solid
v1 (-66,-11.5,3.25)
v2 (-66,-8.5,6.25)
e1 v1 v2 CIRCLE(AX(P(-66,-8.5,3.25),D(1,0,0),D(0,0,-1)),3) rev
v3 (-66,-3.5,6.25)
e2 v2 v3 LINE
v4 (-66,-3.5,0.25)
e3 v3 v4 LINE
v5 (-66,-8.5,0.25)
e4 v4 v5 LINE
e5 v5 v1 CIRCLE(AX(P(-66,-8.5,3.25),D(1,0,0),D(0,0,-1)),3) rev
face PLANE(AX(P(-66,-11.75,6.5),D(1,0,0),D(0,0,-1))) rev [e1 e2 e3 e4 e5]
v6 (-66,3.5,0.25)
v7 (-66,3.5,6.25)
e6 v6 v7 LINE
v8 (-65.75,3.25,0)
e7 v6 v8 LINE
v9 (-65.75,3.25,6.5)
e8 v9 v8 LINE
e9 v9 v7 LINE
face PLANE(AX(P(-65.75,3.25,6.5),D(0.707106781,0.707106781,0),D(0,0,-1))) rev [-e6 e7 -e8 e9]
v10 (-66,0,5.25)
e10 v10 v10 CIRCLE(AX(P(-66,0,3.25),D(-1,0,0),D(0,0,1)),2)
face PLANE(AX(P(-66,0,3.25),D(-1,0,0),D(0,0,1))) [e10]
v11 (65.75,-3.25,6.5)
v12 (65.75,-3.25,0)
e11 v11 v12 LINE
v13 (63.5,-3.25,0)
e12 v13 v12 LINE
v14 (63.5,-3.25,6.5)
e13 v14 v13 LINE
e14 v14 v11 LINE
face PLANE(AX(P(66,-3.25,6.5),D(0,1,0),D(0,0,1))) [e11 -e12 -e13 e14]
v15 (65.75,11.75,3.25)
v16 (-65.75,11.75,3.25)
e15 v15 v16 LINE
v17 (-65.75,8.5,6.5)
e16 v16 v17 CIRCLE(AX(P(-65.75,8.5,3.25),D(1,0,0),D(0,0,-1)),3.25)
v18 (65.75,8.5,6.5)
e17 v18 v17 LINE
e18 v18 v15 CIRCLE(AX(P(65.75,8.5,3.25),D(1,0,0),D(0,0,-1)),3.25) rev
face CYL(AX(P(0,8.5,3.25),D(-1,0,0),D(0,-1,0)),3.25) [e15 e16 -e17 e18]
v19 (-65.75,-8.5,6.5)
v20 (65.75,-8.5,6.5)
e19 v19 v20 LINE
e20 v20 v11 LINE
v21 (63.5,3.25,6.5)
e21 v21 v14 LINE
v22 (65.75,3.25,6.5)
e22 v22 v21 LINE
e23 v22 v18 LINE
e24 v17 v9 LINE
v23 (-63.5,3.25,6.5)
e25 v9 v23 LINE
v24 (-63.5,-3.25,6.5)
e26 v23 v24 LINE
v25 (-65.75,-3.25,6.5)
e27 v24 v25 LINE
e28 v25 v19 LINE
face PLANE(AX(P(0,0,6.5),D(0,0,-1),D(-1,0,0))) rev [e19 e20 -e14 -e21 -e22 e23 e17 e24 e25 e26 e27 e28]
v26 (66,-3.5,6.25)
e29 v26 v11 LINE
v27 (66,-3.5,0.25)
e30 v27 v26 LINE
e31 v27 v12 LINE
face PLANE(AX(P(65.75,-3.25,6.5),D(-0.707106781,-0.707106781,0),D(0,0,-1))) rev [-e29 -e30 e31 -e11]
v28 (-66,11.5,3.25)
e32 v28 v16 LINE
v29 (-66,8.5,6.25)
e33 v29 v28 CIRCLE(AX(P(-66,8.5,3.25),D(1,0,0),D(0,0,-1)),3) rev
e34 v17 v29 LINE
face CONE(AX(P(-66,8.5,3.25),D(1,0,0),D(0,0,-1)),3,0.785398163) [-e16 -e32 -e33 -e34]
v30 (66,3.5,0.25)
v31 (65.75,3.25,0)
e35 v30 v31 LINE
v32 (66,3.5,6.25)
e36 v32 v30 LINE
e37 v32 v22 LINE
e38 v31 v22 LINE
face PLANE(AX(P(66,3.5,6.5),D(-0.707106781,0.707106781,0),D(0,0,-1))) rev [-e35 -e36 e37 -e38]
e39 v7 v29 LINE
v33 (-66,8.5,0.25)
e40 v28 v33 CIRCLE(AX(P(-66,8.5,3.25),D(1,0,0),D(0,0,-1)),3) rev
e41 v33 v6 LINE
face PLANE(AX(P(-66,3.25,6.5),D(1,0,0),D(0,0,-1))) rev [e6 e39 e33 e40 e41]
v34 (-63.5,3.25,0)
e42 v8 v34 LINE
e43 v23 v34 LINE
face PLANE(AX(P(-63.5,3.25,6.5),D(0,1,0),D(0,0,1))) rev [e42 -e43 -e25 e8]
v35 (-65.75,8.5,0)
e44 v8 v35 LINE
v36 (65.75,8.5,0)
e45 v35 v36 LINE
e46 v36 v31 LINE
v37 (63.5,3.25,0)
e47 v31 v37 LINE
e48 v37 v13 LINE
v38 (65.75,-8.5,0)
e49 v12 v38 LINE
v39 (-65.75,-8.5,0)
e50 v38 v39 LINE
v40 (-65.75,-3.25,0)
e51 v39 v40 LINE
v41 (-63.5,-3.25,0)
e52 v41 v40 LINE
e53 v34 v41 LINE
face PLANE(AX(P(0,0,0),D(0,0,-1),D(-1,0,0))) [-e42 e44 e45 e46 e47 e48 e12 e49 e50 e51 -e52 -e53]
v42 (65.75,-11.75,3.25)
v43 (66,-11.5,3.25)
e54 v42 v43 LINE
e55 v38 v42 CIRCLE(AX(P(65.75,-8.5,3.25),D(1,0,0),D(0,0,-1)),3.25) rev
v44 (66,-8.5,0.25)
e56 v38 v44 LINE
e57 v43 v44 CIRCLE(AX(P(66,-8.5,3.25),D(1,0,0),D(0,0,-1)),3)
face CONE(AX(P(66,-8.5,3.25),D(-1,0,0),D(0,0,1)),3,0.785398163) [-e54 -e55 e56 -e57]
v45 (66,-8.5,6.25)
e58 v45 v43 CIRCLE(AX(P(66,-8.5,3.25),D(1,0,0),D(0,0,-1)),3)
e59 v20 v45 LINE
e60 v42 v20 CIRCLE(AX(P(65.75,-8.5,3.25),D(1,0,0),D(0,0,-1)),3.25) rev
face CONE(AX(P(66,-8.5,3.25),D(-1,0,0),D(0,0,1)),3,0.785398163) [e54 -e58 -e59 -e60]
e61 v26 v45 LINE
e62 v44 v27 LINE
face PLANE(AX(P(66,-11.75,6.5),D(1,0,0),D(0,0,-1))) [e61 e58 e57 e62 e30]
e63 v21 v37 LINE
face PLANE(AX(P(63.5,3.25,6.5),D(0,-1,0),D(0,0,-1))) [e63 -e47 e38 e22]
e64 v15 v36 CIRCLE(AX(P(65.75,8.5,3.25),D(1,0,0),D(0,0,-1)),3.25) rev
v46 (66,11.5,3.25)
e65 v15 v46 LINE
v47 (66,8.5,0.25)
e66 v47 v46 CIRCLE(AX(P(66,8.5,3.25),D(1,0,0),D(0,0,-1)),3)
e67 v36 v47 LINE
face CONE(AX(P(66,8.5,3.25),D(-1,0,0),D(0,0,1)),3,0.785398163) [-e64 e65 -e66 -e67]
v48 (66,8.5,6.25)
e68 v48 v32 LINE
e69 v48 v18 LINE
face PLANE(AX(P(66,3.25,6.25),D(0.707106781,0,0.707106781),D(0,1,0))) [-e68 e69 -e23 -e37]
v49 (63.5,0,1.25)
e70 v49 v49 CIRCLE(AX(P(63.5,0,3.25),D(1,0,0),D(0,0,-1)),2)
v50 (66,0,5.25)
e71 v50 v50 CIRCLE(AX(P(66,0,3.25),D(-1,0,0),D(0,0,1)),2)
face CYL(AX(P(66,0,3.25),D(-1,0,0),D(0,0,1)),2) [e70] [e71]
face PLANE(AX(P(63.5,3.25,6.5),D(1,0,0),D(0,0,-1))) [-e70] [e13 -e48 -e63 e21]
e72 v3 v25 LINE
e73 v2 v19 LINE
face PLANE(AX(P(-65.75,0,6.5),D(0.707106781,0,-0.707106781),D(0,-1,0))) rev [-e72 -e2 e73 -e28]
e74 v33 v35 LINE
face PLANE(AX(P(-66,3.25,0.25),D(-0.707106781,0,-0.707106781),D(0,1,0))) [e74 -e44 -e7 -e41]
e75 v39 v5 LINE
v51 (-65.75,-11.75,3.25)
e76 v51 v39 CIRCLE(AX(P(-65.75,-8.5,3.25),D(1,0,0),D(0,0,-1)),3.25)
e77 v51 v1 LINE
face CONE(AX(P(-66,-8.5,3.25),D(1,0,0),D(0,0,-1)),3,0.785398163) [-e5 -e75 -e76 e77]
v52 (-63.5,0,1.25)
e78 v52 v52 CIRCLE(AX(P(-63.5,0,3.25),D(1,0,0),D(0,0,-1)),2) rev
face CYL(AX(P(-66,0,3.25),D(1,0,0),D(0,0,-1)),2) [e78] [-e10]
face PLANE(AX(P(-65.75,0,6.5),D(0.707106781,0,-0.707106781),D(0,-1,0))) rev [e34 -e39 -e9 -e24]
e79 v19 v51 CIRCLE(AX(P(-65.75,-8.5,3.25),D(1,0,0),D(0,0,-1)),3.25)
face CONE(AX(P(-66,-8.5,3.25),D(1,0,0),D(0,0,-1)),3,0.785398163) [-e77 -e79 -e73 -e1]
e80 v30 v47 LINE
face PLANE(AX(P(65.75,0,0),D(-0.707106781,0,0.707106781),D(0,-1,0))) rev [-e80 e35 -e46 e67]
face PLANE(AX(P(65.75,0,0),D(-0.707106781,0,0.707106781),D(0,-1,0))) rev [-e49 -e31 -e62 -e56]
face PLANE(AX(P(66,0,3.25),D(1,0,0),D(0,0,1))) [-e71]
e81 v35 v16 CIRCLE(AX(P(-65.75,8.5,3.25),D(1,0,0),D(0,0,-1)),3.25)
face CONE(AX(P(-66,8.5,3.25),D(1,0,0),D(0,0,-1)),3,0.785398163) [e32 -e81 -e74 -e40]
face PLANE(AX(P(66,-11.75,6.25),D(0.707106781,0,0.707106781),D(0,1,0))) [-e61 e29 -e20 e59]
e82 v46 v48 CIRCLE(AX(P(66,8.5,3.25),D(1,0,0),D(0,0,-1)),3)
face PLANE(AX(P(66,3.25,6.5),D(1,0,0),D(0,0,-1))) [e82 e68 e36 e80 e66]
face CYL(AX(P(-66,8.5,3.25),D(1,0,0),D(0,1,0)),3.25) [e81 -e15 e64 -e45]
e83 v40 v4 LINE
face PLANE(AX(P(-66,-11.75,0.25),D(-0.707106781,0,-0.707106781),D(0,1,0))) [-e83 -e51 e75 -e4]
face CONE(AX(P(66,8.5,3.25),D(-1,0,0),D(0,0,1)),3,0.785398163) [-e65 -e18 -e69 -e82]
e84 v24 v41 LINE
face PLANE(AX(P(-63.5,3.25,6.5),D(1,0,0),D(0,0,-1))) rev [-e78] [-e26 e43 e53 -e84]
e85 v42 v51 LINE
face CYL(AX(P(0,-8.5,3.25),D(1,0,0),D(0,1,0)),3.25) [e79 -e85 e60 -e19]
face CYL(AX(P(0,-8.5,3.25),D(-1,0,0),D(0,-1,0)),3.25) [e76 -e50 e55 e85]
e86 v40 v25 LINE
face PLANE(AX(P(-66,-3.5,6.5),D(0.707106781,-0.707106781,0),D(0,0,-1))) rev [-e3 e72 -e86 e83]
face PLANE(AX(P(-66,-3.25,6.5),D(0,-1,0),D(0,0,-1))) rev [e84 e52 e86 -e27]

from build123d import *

# Parameters (mm, degrees)
BOSS_EXTRUDE1_DEPTH = 6.5
SKETCH2_R           = 2
BOSS_EXTRUDE2_DEPTH = 2.5
FILLET5_R           = 3.25
CHAMFER1_SIZE       = 0.25


with BuildPart() as part:
    # Sketch1 → Boss-Extrude1 (new body)
    with BuildSketch(Plane.XY):
        Polygon((0, -11.75), (-66, -11.75), (-66, -3.25), (-63.5, -3.25), (-63.5, 3.25), (-66, 3.25), (-66, 11.75), (0, 11.75), align=None)
    boss_extrude1 = extrude(amount=BOSS_EXTRUDE1_DEPTH)

    # Sketch2 → Boss-Extrude2 (add)
    with BuildSketch(Plane.ZY.offset(63.5)):
        with Locations(Location((3.25, 0, 0), (0, 0, 180))):
            Circle(SKETCH2_R)
    boss_extrude2 = extrude(amount=BOSS_EXTRUDE2_DEPTH)

    # Mirror1: Boss-Extrude1, Boss-Extrude2 across plane
    add(boss_extrude1.mirror(Plane(origin=(0, 0, 0), x_dir=(0, 0, 1), z_dir=(1, 0, 0))))
    add(boss_extrude2.mirror(Plane(origin=(0, 0, 0), x_dir=(0, 0, 1), z_dir=(1, 0, 0))))

    # Fillet5
    fillet5_edges = [part.edges().sort_by_distance(p)[0] for p in [
        (0, -11.75, 0),
        (0, -11.75, 6.5),
        (0, 11.75, 0),
        (0, 11.75, 6.5),
    ]]
    fillet(fillet5_edges, radius=FILLET5_R - 0.0001)  # a hair under: the kernel refuses the full size

    # Chamfer1
    chamfer1_edges = [part.edges().sort_by_distance(p)[0] for p in [
        (-66, -3.25, 3.25),
        (-66, 3.25, 3.25),
        (-66, -5.87505, 6.5),
        (66, -5.87505, 6.5),
        (66, -3.25, 3.25),
        (66, 3.25, 3.25),
        (66, -5.87505, 0),
        (66, -10.798126328, 5.548126328),
        (66, -10.798126328, 0.951873672),
        (66, 5.87505, 0),
        (-66, 5.87505, 0),
        (-66, -10.798126328, 5.548126328),
        (-66, -10.798126328, 0.951873672),
        (66, 5.87505, 6.5),
        (-66, 5.87505, 6.5),
        (-66, 10.798126328, 0.951873672),
        (-66, 10.798126328, 5.548126328),
        (66, 10.798126328, 0.951873672),
        (66, 10.798126328, 5.548126328),
        (-66, -5.87505, 0),
    ]]
    chamfer(chamfer1_edges, length=CHAMFER1_SIZE)


solid = part.part
